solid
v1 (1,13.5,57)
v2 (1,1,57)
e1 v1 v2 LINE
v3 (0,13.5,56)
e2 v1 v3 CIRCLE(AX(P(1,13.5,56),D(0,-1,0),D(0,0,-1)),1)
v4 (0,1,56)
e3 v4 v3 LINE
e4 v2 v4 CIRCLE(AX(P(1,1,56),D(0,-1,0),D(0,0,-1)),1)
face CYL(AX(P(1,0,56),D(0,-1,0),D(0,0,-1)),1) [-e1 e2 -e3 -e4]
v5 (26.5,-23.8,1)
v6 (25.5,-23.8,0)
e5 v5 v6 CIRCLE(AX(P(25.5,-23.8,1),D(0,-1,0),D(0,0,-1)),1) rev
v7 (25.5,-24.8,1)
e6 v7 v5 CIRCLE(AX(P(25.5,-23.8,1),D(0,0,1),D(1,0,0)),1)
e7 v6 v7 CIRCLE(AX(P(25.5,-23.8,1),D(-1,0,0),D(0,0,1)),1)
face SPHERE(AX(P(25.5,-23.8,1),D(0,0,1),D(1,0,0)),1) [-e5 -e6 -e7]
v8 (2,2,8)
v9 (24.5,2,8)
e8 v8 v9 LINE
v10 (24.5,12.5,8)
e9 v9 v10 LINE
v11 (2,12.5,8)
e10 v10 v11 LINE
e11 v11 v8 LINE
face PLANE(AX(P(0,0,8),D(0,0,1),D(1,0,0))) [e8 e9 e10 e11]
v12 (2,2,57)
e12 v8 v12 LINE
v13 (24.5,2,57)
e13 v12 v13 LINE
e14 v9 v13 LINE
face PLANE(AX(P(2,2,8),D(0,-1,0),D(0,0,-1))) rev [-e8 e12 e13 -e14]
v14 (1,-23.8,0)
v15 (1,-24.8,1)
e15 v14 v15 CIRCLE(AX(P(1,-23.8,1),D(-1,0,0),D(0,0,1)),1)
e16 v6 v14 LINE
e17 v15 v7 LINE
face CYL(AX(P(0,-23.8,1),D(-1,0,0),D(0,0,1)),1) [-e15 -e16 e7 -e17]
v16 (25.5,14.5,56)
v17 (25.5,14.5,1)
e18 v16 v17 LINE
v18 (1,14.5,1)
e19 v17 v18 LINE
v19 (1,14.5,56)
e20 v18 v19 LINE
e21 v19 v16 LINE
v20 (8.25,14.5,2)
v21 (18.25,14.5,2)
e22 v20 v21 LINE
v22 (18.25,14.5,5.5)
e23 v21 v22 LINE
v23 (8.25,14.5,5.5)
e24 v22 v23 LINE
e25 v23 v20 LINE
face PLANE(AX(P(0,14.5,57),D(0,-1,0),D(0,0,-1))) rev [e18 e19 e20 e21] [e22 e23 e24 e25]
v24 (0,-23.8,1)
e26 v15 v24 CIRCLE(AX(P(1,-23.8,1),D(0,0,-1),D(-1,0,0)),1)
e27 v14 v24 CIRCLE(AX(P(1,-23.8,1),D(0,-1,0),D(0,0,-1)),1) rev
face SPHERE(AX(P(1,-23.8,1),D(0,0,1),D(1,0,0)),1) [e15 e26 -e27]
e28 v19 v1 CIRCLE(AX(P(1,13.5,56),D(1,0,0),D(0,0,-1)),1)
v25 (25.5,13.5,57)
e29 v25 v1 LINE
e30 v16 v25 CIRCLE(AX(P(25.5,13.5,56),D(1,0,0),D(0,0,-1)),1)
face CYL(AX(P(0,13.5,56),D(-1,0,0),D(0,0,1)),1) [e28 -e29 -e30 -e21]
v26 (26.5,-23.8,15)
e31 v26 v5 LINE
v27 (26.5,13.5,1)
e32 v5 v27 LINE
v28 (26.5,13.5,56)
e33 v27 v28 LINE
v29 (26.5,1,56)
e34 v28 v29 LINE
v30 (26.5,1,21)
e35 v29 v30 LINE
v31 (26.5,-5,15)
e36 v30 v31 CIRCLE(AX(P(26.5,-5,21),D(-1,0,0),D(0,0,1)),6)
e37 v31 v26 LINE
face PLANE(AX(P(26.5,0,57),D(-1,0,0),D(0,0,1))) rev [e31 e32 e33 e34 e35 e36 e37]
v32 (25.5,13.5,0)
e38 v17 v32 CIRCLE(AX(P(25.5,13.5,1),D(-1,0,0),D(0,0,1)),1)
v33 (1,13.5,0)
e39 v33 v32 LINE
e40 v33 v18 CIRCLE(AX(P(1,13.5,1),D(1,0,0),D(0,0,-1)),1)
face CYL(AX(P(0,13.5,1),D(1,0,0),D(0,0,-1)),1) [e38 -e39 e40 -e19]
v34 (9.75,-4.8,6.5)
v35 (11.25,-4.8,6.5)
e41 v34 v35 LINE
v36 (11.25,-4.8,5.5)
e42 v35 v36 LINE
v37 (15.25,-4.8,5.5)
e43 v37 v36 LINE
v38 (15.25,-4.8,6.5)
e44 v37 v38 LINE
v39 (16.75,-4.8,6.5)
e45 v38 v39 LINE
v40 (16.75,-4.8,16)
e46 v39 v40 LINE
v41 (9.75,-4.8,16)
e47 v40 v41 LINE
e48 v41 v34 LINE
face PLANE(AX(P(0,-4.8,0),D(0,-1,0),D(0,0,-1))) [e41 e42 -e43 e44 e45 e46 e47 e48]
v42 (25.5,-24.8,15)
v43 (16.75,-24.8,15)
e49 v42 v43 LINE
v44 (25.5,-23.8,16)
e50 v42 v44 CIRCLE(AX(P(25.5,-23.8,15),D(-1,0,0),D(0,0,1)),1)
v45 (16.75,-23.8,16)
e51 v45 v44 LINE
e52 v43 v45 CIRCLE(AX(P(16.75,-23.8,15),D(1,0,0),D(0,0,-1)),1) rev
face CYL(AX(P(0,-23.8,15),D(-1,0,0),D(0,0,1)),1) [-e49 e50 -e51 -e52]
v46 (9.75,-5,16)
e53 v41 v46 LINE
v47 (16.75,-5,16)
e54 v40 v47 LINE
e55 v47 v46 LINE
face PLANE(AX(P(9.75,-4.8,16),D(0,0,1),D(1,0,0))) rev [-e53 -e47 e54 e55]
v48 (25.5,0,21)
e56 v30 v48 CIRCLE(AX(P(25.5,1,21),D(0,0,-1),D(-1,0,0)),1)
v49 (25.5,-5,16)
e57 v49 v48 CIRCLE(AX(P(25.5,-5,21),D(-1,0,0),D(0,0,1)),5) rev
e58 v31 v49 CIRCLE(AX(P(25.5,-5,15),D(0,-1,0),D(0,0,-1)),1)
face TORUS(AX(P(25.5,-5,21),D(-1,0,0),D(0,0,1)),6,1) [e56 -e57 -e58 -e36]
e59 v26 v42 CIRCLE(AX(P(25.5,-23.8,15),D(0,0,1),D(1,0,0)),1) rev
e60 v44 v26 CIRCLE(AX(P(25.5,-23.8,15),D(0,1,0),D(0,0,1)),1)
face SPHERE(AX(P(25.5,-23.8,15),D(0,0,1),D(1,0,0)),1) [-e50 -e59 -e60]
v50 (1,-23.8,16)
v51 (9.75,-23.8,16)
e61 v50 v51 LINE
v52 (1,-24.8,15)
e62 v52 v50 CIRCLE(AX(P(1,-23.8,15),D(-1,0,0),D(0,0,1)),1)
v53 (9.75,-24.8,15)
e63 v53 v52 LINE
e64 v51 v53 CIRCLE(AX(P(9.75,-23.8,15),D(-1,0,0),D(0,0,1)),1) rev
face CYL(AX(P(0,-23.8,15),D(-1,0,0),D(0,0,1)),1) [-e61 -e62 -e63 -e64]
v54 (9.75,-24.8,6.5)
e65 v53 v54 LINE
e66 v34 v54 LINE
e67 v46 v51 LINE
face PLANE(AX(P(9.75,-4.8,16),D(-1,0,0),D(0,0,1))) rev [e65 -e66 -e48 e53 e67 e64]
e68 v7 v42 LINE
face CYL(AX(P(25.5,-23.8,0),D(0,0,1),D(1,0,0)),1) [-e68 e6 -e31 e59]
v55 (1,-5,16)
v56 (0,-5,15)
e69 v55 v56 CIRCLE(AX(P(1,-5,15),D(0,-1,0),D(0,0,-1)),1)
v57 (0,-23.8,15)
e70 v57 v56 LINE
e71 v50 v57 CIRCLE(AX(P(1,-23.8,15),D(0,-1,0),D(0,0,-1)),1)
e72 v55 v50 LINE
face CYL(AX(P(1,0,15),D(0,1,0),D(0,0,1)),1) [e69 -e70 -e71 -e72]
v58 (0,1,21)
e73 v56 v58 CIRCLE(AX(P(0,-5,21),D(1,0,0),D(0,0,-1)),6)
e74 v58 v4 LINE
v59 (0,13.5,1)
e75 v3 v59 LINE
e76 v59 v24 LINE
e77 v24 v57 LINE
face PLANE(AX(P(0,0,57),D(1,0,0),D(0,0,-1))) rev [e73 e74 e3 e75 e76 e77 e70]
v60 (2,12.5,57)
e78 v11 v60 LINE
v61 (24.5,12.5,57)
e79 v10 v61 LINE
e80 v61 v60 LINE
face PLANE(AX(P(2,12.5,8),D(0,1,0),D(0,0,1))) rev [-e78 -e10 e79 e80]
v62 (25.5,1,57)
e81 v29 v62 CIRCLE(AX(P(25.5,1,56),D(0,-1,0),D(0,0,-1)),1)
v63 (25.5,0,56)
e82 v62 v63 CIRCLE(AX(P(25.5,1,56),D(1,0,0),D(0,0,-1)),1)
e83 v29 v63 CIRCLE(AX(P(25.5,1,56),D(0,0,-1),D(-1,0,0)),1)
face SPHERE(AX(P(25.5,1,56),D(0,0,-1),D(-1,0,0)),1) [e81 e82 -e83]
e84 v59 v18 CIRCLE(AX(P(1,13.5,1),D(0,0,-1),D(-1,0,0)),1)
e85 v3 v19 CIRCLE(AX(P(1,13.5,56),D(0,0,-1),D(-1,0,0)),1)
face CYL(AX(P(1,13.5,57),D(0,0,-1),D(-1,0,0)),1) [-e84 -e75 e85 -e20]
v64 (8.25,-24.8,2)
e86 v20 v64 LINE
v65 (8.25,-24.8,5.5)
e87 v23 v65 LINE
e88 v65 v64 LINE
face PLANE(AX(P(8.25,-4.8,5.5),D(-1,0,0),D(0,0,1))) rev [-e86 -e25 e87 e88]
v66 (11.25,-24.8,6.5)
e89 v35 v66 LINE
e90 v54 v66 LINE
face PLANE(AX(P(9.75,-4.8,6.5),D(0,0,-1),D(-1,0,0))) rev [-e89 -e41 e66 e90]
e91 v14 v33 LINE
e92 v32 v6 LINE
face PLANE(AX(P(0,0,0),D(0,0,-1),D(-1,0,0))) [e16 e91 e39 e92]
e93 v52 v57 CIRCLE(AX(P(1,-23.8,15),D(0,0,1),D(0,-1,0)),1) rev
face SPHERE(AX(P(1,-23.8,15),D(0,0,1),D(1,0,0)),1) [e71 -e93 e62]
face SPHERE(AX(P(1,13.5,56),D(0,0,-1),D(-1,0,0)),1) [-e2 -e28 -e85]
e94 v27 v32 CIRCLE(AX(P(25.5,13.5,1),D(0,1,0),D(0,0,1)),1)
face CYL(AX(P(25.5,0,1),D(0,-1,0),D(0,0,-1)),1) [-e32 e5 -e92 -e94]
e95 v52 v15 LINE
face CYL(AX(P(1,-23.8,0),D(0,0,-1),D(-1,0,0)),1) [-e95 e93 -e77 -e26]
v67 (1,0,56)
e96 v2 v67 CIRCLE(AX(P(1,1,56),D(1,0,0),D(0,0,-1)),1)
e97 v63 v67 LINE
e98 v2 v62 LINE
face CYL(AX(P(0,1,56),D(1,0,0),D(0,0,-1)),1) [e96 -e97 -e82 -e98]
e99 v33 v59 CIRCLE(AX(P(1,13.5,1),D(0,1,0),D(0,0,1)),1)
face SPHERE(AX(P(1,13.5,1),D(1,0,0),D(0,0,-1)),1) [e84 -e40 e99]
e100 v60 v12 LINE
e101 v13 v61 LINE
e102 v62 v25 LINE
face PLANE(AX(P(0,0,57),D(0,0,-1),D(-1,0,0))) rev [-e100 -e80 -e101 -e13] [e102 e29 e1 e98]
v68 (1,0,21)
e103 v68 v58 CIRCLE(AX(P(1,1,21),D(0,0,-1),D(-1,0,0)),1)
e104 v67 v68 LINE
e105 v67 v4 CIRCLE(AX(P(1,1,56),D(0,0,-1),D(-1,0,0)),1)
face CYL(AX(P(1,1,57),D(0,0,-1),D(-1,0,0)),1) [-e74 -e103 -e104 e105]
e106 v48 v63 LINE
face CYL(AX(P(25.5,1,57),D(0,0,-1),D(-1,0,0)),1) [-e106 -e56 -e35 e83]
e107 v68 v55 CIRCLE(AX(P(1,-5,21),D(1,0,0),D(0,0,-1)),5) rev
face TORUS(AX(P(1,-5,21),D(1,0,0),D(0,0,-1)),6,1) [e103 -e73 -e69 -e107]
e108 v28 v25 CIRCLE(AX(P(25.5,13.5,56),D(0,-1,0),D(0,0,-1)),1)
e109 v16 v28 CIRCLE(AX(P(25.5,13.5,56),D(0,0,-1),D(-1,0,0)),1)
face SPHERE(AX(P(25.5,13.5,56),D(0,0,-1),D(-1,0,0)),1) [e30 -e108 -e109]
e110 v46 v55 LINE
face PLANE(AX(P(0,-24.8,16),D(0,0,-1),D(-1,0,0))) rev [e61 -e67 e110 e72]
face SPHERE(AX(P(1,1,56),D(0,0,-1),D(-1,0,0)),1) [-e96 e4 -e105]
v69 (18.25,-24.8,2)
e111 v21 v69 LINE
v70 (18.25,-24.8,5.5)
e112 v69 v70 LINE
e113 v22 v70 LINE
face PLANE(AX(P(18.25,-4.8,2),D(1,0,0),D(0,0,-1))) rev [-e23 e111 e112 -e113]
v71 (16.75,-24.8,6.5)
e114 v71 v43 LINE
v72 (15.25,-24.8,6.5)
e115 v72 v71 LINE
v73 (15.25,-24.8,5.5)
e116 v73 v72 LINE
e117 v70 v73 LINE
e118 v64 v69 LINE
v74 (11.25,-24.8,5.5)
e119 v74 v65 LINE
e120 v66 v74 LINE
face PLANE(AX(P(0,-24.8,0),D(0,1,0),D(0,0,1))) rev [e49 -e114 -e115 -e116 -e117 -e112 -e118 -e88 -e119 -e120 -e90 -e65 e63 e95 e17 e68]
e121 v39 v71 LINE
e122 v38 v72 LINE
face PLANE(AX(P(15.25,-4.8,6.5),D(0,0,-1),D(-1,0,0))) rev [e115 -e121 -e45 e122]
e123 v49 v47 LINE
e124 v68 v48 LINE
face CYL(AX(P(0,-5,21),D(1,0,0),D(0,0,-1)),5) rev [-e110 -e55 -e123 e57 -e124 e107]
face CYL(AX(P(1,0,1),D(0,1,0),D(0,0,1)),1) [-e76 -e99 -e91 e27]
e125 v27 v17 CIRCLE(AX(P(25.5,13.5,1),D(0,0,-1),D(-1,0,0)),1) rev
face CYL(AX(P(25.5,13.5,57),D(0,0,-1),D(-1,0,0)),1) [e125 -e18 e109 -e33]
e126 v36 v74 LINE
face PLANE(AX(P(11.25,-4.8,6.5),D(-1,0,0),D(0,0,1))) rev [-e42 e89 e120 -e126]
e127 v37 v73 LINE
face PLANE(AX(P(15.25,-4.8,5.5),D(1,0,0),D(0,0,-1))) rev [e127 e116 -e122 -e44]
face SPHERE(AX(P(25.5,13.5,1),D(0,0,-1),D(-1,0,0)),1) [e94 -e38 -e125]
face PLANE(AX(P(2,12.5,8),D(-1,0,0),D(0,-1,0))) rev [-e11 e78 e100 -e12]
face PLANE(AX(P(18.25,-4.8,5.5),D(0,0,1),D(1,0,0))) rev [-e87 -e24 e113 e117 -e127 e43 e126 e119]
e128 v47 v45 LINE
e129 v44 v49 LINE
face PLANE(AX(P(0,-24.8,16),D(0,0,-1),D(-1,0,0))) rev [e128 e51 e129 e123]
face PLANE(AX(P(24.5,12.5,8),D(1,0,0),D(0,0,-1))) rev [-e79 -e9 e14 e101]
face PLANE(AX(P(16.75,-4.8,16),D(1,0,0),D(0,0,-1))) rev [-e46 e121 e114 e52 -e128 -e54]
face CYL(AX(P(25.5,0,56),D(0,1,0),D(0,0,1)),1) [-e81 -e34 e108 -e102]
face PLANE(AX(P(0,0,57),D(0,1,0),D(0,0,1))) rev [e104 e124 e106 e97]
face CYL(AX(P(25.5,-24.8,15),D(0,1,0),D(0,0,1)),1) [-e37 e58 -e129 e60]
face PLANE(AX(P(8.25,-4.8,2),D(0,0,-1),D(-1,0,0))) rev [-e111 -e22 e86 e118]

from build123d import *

# Parameters (mm, degrees)
SKETCH_2_W          = 26.5
SKETCH_2_H          = 14.5
EXTRUDE_1_DEPTH     = 57
SKETCH_6_W          = 22.5
SKETCH_6_H          = 10.5
CUT_EXTRUDE_1_DEPTH = 49
SKETCH_7_W          = 26.5
SKETCH_7_H          = 16
EXTRUDE_2_DEPTH     = 24.8
FILLET_1_R          = 5
FILLET_2_R          = 1
FILLET_4_R          = 1
FILLET_5_R          = 1
FILLET_6_R          = 1
CUT_EXTRUDE_2_DEPTH = 20
SKETCH_10_W         = 10
SKETCH_10_H         = 3.5
CUT_EXTRUDE_3_DEPTH = 40


with BuildPart() as part:
    # ｽｹｯﾁ2 → ﾎﾞｽ - 押し出し1 (new body)
    with BuildSketch(Plane.XY):
        with Locations((13.25, 7.25)):
            Rectangle(SKETCH_2_W, SKETCH_2_H)
    extrude(amount=EXTRUDE_1_DEPTH)

    # ｽｹｯﾁ6 → ｶｯﾄ - 押し出し1 (cut)
    with BuildSketch(Plane.XY.offset(57)):
        with Locations((13.25, 7.25)):
            Rectangle(SKETCH_6_W, SKETCH_6_H)
    extrude(amount=-CUT_EXTRUDE_1_DEPTH, mode=Mode.SUBTRACT)

    # ｽｹｯﾁ7 → ﾎﾞｽ - 押し出し2 (add)
    with BuildSketch(Plane.XZ):
        with Locations((13.25, 8)):
            Rectangle(SKETCH_7_W, SKETCH_7_H)
    extrude(amount=EXTRUDE_2_DEPTH)

    # ﾌｨﾚｯﾄ1
    fillet_1_edges = [part.edges().sort_by_distance(p)[0] for p in [
        (13.25, 0, 16),
    ]]
    fillet(fillet_1_edges, radius=FILLET_1_R)

    # ﾌｨﾚｯﾄ2
    fillet_2_edges = [part.edges().sort_by_distance(p)[0] for p in [
        (26.5, 14.5, 28.5),
    ]]
    fillet(fillet_2_edges, radius=FILLET_2_R)

    # ﾌｨﾚｯﾄ4
    fillet_4_edges = [part.edges().sort_by_distance(p)[0] for p in [
        (26.5, -14.9, 16),
        (26.5, -24.8, 8),
        (26.5, -1.464466094, 17.464466094),
        (12.75, 14.5, 0),
        (26.207106781, 14.207106781, 0),
        (26.5, -5.65, 0),
        (26.5, 0, 39),
    ]]
    fillet(fillet_4_edges, radius=FILLET_4_R)

    # ﾌｨﾚｯﾄ5
    # the kernel refuses this fillet: 1 mm, written as the material it takes off along each edge
    with BuildSketch(Plane(origin=(25.5, -23.8, 15), x_dir=(0, -1, 0), z_dir=(0, 0, 1))) as fillet_5_piece_1_section:
        Polygon((0, 0), (FILLET_5_R, 0), (FILLET_5_R, FILLET_5_R), (0, FILLET_5_R), align=None)
    fillet_5_piece_1 = extrude(amount=FILLET_5_R, mode=Mode.PRIVATE)
    fillet_5_piece_1 = fillet_5_piece_1 - Plane(origin=(25.5, -23.8, 15), x_dir=(-0.7071067811865475, 0.7071067811865475, 0), z_dir=(0, 0, 1)) * Sphere(FILLET_5_R, mode=Mode.PRIVATE)
    add(fillet_5_piece_1, mode=Mode.SUBTRACT)
    with BuildSketch(Plane(origin=(25.5, -23.8, 1), x_dir=(0, -1, 0), z_dir=(0, 0, -1))) as fillet_5_piece_2_section:
        Polygon((0, 0), (FILLET_5_R, 0), (FILLET_5_R, -FILLET_5_R), (0, -FILLET_5_R), align=None)
    fillet_5_piece_2 = extrude(amount=FILLET_5_R, mode=Mode.PRIVATE)
    fillet_5_piece_2 = fillet_5_piece_2 - Plane(origin=(25.5, -23.8, 1), x_dir=(-0.7071067811865475, 0.7071067811865475, 0), z_dir=(0, 0, -1)) * Sphere(FILLET_5_R, mode=Mode.PRIVATE)
    add(fillet_5_piece_2, mode=Mode.SUBTRACT)
    with BuildSketch(Plane(origin=(1, -23.8, 15), x_dir=(-1, 0, 0), z_dir=(0, -1, 0))) as fillet_5_piece_3_section:
        Polygon((0, 0), (FILLET_5_R, 0), (FILLET_5_R, -FILLET_5_R), (0, -FILLET_5_R), align=None)
    fillet_5_piece_3 = extrude(amount=FILLET_5_R, mode=Mode.PRIVATE)
    fillet_5_piece_3 = fillet_5_piece_3 - Plane(origin=(1, -23.8, 15), x_dir=(0.7071067811865475, 0, -0.7071067811865475), z_dir=(0, -1, 0)) * Sphere(FILLET_5_R, mode=Mode.PRIVATE)
    add(fillet_5_piece_3, mode=Mode.SUBTRACT)
    with BuildSketch(Plane(origin=(1, -23.8, 1), x_dir=(-1, 0, 0), z_dir=(0, 0, -1))) as fillet_5_piece_4_section:
        Polygon((0, 0), (FILLET_5_R, 0), (FILLET_5_R, -FILLET_5_R), (0, -FILLET_5_R), align=None)
    fillet_5_piece_4 = extrude(amount=FILLET_5_R, mode=Mode.PRIVATE)
    fillet_5_piece_4 = fillet_5_piece_4 - Plane(origin=(1, -23.8, 1), x_dir=(0.7071067811865475, 0.7071067811865475, 0), z_dir=(0, 0, -1)) * Sphere(FILLET_5_R, mode=Mode.PRIVATE)
    add(fillet_5_piece_4, mode=Mode.SUBTRACT)
    with BuildSketch(Plane(origin=(0, -5, 16), x_dir=(0, 0, -1), z_dir=(0, -1, 0))) as fillet_5_piece_5:
        with BuildLine():
            CenterArc((FILLET_5_R, FILLET_5_R), FILLET_5_R, 180, 90)
            Line((0, FILLET_5_R), (0, 0))
            Line((0, 0), (FILLET_5_R, 0))
        make_face()
    extrude(amount=18.8, mode=Mode.SUBTRACT)
    with BuildSketch(Plane(origin=(0, -24.8, 15), x_dir=(0, 1, 0), z_dir=(0, 0, -1))) as fillet_5_piece_6:
        with BuildLine():
            CenterArc((FILLET_5_R, FILLET_5_R), FILLET_5_R, 180, 90)
            Line((0, FILLET_5_R), (0, 0))
            Line((0, 0), (FILLET_5_R, 0))
        make_face()
    extrude(amount=14, mode=Mode.SUBTRACT)
    with BuildSketch(Plane(origin=(1, -24.8, 0), x_dir=(0, 1, 0), z_dir=(1, 0, 0)), Plane(origin=(25.5, -24.8, 16), x_dir=(0, 1, 0), z_dir=(-1, 0, 0))) as fillet_5_piece_7:
        with BuildLine():
            CenterArc((FILLET_5_R, FILLET_5_R), FILLET_5_R, 180, 90)
            Line((0, FILLET_5_R), (0, 0))
            Line((0, 0), (FILLET_5_R, 0))
        make_face()
    extrude(amount=24.5, mode=Mode.SUBTRACT)
    with BuildSketch(Plane(origin=(0, -5, 21), x_dir=(0, 1, 0), z_dir=(0, 0, 1))) as fillet_5_piece_8:
        with BuildLine():
            CenterArc((5 + FILLET_5_R, -FILLET_5_R), FILLET_5_R, 90, 90)
            Line((5, -FILLET_5_R), (5, 0))
            Line((5, 0), (5 + FILLET_5_R, 0))
        make_face()
    revolve(axis=Axis((0, -5, 21), (-1, 0, 0)), revolution_arc=90, mode=Mode.SUBTRACT)
    with BuildSketch(Plane(origin=(0, 13.5, 0), x_dir=(0, 0, 1), z_dir=(0, -1, 0))) as fillet_5_piece_9:
        with BuildLine():
            CenterArc((FILLET_5_R, -FILLET_5_R), FILLET_5_R, 90, 90)
            Line((0, -FILLET_5_R), (0, 0))
            Line((0, 0), (FILLET_5_R, 0))
        make_face()
    extrude(amount=37.3, mode=Mode.SUBTRACT)
    with BuildSketch(Plane(origin=(0, 13.5, 1), x_dir=(0, 0, -1), z_dir=(0, -1, 0))) as fillet_5_piece_10:
        with BuildLine():
            CenterArc((1 - FILLET_5_R, FILLET_5_R), FILLET_5_R, 270, 90)
            Line((1, FILLET_5_R), (1, 0))
            Line((1, 0), (1 - FILLET_5_R, 0))
        make_face()
    revolve(axis=Axis((0, 13.5, 1), (1, 0, 0)), revolution_arc=90, mode=Mode.SUBTRACT)
    with BuildSketch(Plane(origin=(0, 14.5, 1), x_dir=(1, 0, 0), z_dir=(0, 0, 1))) as fillet_5_piece_11:
        with BuildLine():
            CenterArc((FILLET_5_R, -FILLET_5_R), FILLET_5_R, 90, 90)
            Line((0, -FILLET_5_R), (0, 0))
            Line((0, 0), (FILLET_5_R, 0))
        make_face()
    extrude(amount=58.5, mode=Mode.SUBTRACT)
    with BuildSketch(Plane(origin=(0, 0, 21), x_dir=(1, 0, 0), z_dir=(0, 0, 1))) as fillet_5_piece_12:
        with BuildLine():
            CenterArc((FILLET_5_R, FILLET_5_R), FILLET_5_R, 180, 90)
            Line((0, FILLET_5_R), (0, 0))
            Line((0, 0), (FILLET_5_R, 0))
        make_face()
    extrude(amount=38.5, mode=Mode.SUBTRACT)

    # ﾌｨﾚｯﾄ6
    fillet_6_edges = [part.edges().sort_by_distance(p)[0] for p in [
        (13.25, 14.5, 57),
        (26.207106781, 14.207106781, 57),
        (26.5, 7.25, 57),
        (26.207106781, 0.292893219, 57),
        (0, 7.25, 57),
        (13.25, 0, 57),
        (0.292893219, 0.292893219, 57),
        (0.292893219, 14.207106781, 57),
    ]]
    fillet(fillet_6_edges, radius=FILLET_6_R)

    # ｽｹｯﾁ8 → ｶｯﾄ - 押し出し2 (cut)
    with BuildSketch(Plane.XZ.offset(24.8)):
        Polygon((9.75, 16), (16.75, 16), (16.75, 6.5), (15.25, 6.5), (15.25, 5.5), (18.25, 5.5), (18.25, 2), (8.25, 2), (8.25, 5.5), (11.25, 5.5), (11.25, 6.5), (9.75, 6.5), align=None)
    extrude(amount=-CUT_EXTRUDE_2_DEPTH, mode=Mode.SUBTRACT)

    # ｽｹｯﾁ10 → ｶｯﾄ - 押し出し3 (cut)
    with BuildSketch(Plane.XZ.offset(24.8)):
        with Locations((13.25, 3.75)):
            Rectangle(SKETCH_10_W, SKETCH_10_H)
    extrude(amount=-CUT_EXTRUDE_3_DEPTH, mode=Mode.SUBTRACT)


solid = part.part
